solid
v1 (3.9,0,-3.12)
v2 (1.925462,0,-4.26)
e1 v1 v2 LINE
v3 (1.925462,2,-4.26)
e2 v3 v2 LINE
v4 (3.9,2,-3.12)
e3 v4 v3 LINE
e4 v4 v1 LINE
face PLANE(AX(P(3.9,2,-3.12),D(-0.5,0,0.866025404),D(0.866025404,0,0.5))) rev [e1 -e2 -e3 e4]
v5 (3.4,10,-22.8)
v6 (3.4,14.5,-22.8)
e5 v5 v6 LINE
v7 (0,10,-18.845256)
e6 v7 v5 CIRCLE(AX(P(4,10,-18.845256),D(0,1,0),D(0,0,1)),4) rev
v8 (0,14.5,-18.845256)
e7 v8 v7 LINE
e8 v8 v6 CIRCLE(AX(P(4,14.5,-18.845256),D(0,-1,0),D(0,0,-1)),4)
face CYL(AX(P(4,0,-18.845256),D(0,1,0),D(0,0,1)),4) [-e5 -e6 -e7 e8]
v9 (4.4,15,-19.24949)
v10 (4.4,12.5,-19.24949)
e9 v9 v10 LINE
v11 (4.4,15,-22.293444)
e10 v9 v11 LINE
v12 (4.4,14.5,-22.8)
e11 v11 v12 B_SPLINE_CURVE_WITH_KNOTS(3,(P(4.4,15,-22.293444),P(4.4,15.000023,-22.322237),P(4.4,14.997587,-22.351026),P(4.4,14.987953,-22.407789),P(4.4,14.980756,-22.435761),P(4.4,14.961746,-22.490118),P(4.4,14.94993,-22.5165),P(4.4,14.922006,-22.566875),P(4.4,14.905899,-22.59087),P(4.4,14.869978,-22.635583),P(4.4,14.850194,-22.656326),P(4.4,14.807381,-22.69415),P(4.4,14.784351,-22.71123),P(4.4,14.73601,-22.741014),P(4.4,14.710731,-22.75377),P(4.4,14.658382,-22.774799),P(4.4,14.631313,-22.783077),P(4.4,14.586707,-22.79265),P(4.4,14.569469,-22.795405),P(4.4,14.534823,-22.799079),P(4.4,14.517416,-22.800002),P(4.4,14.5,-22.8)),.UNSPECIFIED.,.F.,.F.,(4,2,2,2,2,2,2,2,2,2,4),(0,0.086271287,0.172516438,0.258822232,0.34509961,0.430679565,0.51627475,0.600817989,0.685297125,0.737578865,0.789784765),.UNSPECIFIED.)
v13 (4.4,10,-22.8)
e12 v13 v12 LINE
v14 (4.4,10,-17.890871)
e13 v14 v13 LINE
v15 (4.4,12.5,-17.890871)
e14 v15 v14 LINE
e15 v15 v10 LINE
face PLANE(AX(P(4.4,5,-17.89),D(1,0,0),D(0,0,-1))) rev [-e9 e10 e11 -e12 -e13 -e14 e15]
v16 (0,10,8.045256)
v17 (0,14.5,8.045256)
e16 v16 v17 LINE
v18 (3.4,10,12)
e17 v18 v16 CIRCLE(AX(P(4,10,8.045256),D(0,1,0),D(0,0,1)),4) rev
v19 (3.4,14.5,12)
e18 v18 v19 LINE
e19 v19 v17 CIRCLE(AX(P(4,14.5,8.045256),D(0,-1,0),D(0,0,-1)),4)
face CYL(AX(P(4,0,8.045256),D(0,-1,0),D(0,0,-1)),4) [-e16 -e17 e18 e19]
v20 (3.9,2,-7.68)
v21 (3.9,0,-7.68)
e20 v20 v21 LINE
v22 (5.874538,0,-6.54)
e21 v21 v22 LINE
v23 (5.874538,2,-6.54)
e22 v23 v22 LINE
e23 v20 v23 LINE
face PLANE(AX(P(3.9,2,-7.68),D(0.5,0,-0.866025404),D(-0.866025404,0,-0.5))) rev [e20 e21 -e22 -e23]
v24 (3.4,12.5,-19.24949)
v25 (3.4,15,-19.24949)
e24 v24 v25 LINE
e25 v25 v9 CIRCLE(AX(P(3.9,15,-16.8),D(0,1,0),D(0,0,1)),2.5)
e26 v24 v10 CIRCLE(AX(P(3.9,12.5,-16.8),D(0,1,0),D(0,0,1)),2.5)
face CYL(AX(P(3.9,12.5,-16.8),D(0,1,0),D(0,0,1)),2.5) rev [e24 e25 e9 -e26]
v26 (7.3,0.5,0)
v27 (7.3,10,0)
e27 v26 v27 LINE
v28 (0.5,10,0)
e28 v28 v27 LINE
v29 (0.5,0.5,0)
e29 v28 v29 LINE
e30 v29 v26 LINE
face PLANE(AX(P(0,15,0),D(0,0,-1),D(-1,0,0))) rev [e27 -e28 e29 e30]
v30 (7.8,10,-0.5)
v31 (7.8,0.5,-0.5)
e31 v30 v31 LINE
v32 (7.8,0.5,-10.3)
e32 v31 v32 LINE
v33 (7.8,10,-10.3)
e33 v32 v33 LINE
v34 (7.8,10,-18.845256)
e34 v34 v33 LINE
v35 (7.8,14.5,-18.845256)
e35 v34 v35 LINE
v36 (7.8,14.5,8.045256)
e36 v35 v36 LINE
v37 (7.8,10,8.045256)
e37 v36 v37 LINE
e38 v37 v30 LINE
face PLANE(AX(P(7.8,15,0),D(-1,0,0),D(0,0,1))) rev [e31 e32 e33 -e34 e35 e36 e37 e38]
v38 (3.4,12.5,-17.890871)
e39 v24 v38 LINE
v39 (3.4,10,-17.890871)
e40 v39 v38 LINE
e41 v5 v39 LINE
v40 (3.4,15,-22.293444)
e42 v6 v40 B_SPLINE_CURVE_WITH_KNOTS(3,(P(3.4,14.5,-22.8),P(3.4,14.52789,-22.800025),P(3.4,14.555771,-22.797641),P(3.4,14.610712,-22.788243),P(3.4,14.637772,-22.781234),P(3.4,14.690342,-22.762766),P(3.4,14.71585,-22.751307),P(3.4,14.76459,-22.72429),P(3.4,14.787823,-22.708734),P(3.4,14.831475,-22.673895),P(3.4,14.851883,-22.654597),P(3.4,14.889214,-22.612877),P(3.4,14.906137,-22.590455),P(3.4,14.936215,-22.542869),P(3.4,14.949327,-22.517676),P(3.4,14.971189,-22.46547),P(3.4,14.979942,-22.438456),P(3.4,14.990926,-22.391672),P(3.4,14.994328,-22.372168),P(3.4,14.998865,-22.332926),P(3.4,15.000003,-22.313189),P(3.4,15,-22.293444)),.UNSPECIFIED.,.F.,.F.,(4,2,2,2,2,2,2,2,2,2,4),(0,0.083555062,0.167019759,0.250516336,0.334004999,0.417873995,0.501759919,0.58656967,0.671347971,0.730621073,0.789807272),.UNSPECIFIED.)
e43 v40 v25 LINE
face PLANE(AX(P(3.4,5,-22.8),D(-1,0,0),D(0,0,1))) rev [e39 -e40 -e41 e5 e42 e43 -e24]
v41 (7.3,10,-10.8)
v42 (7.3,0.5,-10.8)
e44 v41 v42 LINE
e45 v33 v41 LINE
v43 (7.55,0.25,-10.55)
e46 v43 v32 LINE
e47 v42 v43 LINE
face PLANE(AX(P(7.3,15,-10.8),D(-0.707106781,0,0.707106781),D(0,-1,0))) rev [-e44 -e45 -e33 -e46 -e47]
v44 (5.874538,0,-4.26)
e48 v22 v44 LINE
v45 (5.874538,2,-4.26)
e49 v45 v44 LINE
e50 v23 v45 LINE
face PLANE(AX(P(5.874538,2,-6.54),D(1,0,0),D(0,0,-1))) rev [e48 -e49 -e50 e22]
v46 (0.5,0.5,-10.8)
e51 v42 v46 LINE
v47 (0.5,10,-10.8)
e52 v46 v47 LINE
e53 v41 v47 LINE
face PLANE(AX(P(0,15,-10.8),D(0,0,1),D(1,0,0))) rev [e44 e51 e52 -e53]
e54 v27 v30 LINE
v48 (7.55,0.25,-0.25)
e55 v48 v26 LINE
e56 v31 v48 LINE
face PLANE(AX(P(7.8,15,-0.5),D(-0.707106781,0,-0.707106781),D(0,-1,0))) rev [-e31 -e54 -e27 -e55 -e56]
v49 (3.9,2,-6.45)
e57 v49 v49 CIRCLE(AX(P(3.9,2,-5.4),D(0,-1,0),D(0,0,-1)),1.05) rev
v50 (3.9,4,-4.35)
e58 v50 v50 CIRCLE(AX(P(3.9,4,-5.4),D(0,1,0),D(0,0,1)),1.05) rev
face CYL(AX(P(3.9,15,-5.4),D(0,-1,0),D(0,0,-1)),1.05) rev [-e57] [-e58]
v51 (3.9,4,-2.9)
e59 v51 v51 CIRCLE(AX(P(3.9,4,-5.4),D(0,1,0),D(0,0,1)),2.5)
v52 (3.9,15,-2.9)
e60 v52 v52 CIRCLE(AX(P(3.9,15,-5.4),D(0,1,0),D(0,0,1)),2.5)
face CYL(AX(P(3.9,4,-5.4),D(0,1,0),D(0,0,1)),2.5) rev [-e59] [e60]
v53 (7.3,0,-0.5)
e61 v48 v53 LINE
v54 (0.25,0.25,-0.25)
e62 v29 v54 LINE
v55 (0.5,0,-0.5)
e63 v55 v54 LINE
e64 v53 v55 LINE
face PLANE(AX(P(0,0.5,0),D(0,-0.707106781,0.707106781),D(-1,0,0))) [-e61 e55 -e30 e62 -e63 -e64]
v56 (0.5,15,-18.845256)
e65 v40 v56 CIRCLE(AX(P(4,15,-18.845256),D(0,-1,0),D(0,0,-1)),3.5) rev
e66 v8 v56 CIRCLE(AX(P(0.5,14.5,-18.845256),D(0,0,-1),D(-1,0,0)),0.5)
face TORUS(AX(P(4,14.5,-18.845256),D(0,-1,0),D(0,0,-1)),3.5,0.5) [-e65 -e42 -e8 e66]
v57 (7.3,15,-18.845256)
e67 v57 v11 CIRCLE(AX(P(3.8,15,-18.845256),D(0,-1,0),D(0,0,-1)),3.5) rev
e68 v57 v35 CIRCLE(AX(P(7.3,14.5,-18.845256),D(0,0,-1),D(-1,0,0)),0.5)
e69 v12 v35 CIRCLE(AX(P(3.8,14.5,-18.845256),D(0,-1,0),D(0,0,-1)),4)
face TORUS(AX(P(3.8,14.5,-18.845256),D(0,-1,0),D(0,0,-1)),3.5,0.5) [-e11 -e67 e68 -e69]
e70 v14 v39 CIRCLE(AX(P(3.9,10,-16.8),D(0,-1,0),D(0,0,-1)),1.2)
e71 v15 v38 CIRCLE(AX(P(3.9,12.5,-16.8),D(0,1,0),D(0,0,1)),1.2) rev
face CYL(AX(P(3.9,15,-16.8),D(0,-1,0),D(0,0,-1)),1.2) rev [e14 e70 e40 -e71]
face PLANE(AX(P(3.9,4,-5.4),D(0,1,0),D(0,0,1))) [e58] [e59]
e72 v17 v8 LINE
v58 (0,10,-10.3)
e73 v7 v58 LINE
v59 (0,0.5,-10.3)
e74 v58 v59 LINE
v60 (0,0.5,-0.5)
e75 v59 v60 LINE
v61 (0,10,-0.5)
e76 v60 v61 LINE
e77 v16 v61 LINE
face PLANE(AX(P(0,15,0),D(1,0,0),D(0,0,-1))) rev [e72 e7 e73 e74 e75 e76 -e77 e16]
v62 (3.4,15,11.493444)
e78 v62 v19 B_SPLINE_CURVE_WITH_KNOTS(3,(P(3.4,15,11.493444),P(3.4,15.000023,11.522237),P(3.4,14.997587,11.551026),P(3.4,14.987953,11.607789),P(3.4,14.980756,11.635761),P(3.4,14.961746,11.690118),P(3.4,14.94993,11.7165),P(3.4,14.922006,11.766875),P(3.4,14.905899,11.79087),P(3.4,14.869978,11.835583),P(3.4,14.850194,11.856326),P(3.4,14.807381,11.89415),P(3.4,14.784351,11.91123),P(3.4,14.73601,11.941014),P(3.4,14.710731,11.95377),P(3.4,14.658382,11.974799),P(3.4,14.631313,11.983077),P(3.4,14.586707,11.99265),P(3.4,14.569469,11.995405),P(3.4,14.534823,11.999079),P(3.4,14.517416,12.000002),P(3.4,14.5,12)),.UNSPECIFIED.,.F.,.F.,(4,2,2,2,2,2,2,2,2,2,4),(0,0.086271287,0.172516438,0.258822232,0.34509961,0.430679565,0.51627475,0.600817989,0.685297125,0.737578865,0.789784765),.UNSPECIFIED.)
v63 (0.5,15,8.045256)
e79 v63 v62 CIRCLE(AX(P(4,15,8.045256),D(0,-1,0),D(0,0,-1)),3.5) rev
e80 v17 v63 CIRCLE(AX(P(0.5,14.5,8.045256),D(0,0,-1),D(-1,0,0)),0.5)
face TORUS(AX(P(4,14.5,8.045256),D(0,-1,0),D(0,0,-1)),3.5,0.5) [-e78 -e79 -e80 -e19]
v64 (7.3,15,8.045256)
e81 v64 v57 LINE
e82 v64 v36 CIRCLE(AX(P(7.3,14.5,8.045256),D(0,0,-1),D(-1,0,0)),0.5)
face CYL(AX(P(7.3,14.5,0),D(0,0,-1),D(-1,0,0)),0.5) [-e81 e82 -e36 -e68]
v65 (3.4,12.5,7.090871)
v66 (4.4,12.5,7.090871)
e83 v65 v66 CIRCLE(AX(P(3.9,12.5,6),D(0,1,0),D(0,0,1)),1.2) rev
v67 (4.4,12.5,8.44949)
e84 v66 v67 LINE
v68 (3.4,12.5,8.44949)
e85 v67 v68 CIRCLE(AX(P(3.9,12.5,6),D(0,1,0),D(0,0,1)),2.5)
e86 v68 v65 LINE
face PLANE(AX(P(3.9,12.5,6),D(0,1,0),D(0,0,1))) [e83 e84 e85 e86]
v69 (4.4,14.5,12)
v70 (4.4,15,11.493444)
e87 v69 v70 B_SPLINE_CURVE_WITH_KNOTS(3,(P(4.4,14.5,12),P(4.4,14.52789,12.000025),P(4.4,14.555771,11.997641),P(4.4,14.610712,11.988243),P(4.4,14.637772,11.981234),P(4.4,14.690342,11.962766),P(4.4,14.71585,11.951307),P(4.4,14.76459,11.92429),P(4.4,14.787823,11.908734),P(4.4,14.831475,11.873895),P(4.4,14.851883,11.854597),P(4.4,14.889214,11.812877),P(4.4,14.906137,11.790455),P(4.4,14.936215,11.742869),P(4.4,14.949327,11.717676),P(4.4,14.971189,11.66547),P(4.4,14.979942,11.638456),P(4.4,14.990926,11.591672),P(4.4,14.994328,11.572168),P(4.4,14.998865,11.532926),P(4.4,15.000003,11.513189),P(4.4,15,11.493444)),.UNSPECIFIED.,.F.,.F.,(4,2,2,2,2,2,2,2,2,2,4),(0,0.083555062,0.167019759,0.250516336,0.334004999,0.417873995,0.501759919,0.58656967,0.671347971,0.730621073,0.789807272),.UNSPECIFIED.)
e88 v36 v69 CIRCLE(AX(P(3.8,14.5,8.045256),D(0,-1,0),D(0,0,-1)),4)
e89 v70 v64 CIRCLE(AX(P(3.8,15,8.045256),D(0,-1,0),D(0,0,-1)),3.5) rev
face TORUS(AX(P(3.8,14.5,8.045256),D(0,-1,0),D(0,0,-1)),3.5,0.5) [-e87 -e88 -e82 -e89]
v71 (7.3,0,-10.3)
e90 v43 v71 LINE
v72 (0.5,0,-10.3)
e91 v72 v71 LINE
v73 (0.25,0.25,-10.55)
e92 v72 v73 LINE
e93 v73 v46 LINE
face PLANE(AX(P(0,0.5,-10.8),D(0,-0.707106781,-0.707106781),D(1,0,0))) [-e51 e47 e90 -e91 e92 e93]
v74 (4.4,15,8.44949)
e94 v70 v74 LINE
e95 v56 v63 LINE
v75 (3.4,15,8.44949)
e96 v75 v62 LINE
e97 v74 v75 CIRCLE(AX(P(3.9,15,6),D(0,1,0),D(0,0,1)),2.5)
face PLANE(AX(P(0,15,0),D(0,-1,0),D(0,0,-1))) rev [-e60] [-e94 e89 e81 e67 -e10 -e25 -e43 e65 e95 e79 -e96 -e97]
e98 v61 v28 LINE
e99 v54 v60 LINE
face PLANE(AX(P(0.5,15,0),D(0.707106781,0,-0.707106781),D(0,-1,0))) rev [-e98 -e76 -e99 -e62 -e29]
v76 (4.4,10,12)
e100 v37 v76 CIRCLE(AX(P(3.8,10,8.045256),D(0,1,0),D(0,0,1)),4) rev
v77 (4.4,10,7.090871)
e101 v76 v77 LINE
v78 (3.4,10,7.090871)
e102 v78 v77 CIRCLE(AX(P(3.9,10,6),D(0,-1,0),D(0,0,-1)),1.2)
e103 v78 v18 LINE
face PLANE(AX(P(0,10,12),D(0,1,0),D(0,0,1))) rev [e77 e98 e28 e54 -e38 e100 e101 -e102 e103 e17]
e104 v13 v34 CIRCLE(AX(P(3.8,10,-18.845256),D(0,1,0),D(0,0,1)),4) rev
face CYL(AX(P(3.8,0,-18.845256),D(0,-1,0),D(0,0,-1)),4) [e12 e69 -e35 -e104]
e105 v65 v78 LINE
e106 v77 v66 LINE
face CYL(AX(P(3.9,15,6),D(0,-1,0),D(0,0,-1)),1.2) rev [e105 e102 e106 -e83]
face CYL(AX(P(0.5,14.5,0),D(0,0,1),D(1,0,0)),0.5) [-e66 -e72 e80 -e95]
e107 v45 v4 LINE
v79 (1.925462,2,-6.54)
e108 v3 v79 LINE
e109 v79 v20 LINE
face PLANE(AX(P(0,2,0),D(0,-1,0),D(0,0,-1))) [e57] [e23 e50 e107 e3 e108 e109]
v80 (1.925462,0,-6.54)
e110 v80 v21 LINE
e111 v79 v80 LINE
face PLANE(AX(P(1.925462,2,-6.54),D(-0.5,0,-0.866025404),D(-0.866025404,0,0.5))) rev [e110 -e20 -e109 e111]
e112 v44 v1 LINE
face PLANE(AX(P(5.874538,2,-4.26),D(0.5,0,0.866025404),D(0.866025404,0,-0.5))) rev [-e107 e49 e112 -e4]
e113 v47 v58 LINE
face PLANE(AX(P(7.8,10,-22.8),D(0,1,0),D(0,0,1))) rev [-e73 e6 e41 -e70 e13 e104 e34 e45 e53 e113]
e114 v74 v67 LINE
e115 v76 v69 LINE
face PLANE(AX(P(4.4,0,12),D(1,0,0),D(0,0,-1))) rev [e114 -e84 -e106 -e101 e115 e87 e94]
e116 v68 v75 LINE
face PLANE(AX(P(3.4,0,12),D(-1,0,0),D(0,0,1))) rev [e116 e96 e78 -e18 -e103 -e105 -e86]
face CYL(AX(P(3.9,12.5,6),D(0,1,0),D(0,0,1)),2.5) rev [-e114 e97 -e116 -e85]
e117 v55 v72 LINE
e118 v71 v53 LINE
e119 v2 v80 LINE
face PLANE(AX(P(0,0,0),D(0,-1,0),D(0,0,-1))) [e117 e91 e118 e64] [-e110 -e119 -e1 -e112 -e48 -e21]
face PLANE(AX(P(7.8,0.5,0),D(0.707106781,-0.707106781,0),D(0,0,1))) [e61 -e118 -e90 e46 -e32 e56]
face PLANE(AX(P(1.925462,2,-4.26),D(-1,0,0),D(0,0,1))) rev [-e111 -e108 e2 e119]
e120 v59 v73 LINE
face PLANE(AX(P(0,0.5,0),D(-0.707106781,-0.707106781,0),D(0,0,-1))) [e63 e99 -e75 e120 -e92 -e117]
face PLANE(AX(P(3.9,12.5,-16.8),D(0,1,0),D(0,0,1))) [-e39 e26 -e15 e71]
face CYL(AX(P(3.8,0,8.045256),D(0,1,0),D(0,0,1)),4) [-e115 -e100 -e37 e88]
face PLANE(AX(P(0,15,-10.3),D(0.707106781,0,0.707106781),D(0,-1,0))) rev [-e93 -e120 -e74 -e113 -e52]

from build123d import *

# Parameters (mm, degrees)
ESQUISSE1_W             = 7.8
ESQUISSE1_H             = 10.8
BOSS_EXTRU_1_DEPTH      = 15
ESQUISSE6_R             = 1.05
ENL_V_MAT_EXTRU_2_DEPTH = 21.061904197
ENL_V_MAT_EXTRU_3_DEPTH = 2
ESQUISSE8_R             = 2.5
ENL_V_MAT_EXTRU_4_DEPTH = 11
ESQUISSE9_W             = 7.8
ESQUISSE9_H             = 5
BOSS_EXTRU_2_DEPTH      = 12
ESQUISSE10_W            = 7.8
ESQUISSE10_H            = 5
BOSS_EXTRU_3_DEPTH      = 12
ESQUISSE11_R            = 1.2
ENL_V_MAT_EXTRU_5_DEPTH = 27.089844768
ESQUISSE15_W            = 1
ESQUISSE15_H            = 4.909128789
ENL_V_MAT_EXTRU_6_DEPTH = 29.384502814
ESQUISSE16_R            = 2.5
ENL_V_MAT_EXTRU_7_DEPTH = 2.5
ESQUISSE17_W            = 1
ESQUISSE17_H            = 4.91
ENL_V_MAT_EXTRU_8_DEPTH = 10
CONG_3_R                = 4
CHANFREIN1_SIZE         = 0.5
CHANFREIN2_SIZE         = 0.5
CONG_5_R                = 0.5


with BuildPart() as part:
    # Esquisse1 → Boss.-Extru.1 (new body)
    with BuildSketch(Plane(origin=(0, 0, 0), x_dir=(1, 0, 0), z_dir=(0, 1, 0))):
        with Locations((3.9, 5.4)):
            Rectangle(ESQUISSE1_W, ESQUISSE1_H)
    extrude(amount=BOSS_EXTRU_1_DEPTH)

    # Esquisse6 → Enlèv. mat.-Extru.2 (cut, through all)
    with BuildSketch(Plane.XZ):
        with Locations(Location((3.9, -5.4, 0), (0, 0, 270))):
            Circle(ESQUISSE6_R)
    extrude(amount=-ENL_V_MAT_EXTRU_2_DEPTH, mode=Mode.SUBTRACT)

    # Esquisse7 → Enlèv. mat.-Extru.3 (cut)
    with BuildSketch(Plane.XZ):
        Polygon((3.9, -7.68), (5.874537921, -6.54), (5.874537921, -4.26), (3.9, -3.12), (1.925462079, -4.26), (1.925462079, -6.54), align=None)
    extrude(amount=-ENL_V_MAT_EXTRU_3_DEPTH, mode=Mode.SUBTRACT)

    # Esquisse8 → Enlèv. mat.-Extru.4 (cut)
    with BuildSketch(Plane(origin=(0, 15, 0), x_dir=(1, 0, 0), z_dir=(0, 1, 0))):
        with Locations(Location((3.9, 5.4, 0), (0, 0, 270))):
            Circle(ESQUISSE8_R)
    extrude(amount=-ENL_V_MAT_EXTRU_4_DEPTH, mode=Mode.SUBTRACT)

    # Esquisse9 → Boss.-Extru.2 (add)
    with BuildSketch(Plane(origin=(0, 0, -10.8), x_dir=(-1, 0, 0), z_dir=(0, 0, -1))):
        with Locations((-3.9, 12.5)):
            Rectangle(ESQUISSE9_W, ESQUISSE9_H)
    extrude(amount=BOSS_EXTRU_2_DEPTH)

    # Esquisse10 → Boss.-Extru.3 (add)
    with BuildSketch(Plane.XY):
        with Locations((3.9, 12.5)):
            Rectangle(ESQUISSE10_W, ESQUISSE10_H)
    extrude(amount=BOSS_EXTRU_3_DEPTH)

    # Esquisse11 → Enlèv. mat.-Extru.5 (cut, through all)
    with BuildSketch(Plane.XZ.offset(-10)):
        with Locations(Location((3.9, -16.8, 0), (0, 0, 270))):
            Circle(ESQUISSE11_R)
        with Locations(Location((3.9, 6, 0), (0, 0, 270))):
            Circle(ESQUISSE11_R)
    extrude(amount=-ENL_V_MAT_EXTRU_5_DEPTH, mode=Mode.SUBTRACT)

    # Esquisse15 → Enlèv. mat.-Extru.6 (cut, through all)
    with BuildSketch(Plane(origin=(0, 15, 0), x_dir=(1, 0, 0), z_dir=(0, 1, 0))):
        with Locations((3.9, -9.545435605)):
            Rectangle(ESQUISSE15_W, ESQUISSE15_H)
    extrude(amount=-ENL_V_MAT_EXTRU_6_DEPTH, mode=Mode.SUBTRACT)

    # Esquisse16 → Enlèv. mat.-Extru.7 (cut)
    with BuildSketch(Plane(origin=(0, 15, 0), x_dir=(1, 0, 0), z_dir=(0, 1, 0))):
        with Locations(Location((3.9, 16.8, 0), (0, 0, 270))):
            Circle(ESQUISSE16_R)
        with Locations((3.9, -6)):
            Circle(ESQUISSE16_R)
    extrude(amount=-ENL_V_MAT_EXTRU_7_DEPTH, mode=Mode.SUBTRACT)

    # Esquisse17 → Enlèv. mat.-Extru.8 (cut)
    with BuildSketch(Plane(origin=(0, 15, 0), x_dir=(1, 0, 0), z_dir=(0, 1, 0))):
        with Locations((3.9, 20.345)):
            Rectangle(ESQUISSE17_W, ESQUISSE17_H)
    extrude(amount=-ENL_V_MAT_EXTRU_8_DEPTH, mode=Mode.SUBTRACT)

    # Congé3
    # the kernel refuses this fillet: 4 mm, written as the material it takes off along each edge
    with BuildSketch(Plane(origin=(7.8, 24.886859967, 12), x_dir=(-1, 0, 0), z_dir=(0, -1, 0)), Plane(origin=(7.8, 0.113140033, -22.8), x_dir=(-1, 0, 0), z_dir=(0, 1, 0))) as cong_3_piece_1:
        with BuildLine():
            CenterArc((4, 3.954743987), CONG_3_R, 180, 81.373073441)
            Line((0, 3.954743987), (-0.08, 3.954743987))
            Line((-0.08, 3.954743987), (-0.08, 0))
            Line((-0.08, 0), (0, -0.08))
            ThreePointArc((0, -0.08), (1.7, -0.08), (3.388, -0.07909488))
            Line((3.388, -0.07909488), (3.4, 0))
        make_face()
    extrude(amount=24.773719933, mode=Mode.SUBTRACT)
    with BuildSketch(Plane(origin=(0, 0.113140033, 12), x_dir=(0, 0, -1), z_dir=(0, 1, 0)), Plane(origin=(0, 24.886859967, -22.8), x_dir=(0, 0, 1), z_dir=(0, -1, 0))) as cong_3_piece_2:
        with BuildLine():
            CenterArc((3.954743987, -4), CONG_3_R, 90, 81.373073441)
            Line((0, -3.4), (-0.07909488, -3.388))
            ThreePointArc((-0.07909488, -3.388), (-0.08, -1.7), (-0.08, 0))
            Line((-0.08, 0), (0, 0.08))
            Line((0, 0.08), (3.954743987, 0.08))
            Line((3.954743987, 0.08), (3.954743987, 0))
        make_face()
    extrude(amount=24.773719933, mode=Mode.SUBTRACT)

    # Chanfrein1
    chanfrein1_edges = [part.edges().sort_by_distance(p)[0] for p in [
        (3.9, 0, -10.8),
        (7.8, 0, -5.4),
        (3.9, 0, 0),
        (0, 0, -5.4),
    ]]
    chamfer(chanfrein1_edges, length=CHANFREIN1_SIZE)

    # Chanfrein2
    chanfrein2_edges = [part.edges().sort_by_distance(p)[0] for p in [
        (0, 5.25, -10.8),
        (7.8, 5.25, -10.8),
        (7.8, 5.25, 0),
        (0, 5.25, 0),
    ]]
    chamfer(chanfrein2_edges, length=CHANFREIN2_SIZE)

    # Congé5
    cong_5_edges = [part.edges().sort_by_distance(p)[0] for p in [
        (0, 15, -5.4),
        (7.8, 15, -5.4),
        (0.966849822, 15, -21.452936975),
        (0.966849822, 15, 10.652936975),
        (6.833150178, 15, -21.452936975),
        (6.833150178, 15, 10.652936975),
    ]]
    fillet(cong_5_edges, radius=CONG_5_R)


solid = part.part
